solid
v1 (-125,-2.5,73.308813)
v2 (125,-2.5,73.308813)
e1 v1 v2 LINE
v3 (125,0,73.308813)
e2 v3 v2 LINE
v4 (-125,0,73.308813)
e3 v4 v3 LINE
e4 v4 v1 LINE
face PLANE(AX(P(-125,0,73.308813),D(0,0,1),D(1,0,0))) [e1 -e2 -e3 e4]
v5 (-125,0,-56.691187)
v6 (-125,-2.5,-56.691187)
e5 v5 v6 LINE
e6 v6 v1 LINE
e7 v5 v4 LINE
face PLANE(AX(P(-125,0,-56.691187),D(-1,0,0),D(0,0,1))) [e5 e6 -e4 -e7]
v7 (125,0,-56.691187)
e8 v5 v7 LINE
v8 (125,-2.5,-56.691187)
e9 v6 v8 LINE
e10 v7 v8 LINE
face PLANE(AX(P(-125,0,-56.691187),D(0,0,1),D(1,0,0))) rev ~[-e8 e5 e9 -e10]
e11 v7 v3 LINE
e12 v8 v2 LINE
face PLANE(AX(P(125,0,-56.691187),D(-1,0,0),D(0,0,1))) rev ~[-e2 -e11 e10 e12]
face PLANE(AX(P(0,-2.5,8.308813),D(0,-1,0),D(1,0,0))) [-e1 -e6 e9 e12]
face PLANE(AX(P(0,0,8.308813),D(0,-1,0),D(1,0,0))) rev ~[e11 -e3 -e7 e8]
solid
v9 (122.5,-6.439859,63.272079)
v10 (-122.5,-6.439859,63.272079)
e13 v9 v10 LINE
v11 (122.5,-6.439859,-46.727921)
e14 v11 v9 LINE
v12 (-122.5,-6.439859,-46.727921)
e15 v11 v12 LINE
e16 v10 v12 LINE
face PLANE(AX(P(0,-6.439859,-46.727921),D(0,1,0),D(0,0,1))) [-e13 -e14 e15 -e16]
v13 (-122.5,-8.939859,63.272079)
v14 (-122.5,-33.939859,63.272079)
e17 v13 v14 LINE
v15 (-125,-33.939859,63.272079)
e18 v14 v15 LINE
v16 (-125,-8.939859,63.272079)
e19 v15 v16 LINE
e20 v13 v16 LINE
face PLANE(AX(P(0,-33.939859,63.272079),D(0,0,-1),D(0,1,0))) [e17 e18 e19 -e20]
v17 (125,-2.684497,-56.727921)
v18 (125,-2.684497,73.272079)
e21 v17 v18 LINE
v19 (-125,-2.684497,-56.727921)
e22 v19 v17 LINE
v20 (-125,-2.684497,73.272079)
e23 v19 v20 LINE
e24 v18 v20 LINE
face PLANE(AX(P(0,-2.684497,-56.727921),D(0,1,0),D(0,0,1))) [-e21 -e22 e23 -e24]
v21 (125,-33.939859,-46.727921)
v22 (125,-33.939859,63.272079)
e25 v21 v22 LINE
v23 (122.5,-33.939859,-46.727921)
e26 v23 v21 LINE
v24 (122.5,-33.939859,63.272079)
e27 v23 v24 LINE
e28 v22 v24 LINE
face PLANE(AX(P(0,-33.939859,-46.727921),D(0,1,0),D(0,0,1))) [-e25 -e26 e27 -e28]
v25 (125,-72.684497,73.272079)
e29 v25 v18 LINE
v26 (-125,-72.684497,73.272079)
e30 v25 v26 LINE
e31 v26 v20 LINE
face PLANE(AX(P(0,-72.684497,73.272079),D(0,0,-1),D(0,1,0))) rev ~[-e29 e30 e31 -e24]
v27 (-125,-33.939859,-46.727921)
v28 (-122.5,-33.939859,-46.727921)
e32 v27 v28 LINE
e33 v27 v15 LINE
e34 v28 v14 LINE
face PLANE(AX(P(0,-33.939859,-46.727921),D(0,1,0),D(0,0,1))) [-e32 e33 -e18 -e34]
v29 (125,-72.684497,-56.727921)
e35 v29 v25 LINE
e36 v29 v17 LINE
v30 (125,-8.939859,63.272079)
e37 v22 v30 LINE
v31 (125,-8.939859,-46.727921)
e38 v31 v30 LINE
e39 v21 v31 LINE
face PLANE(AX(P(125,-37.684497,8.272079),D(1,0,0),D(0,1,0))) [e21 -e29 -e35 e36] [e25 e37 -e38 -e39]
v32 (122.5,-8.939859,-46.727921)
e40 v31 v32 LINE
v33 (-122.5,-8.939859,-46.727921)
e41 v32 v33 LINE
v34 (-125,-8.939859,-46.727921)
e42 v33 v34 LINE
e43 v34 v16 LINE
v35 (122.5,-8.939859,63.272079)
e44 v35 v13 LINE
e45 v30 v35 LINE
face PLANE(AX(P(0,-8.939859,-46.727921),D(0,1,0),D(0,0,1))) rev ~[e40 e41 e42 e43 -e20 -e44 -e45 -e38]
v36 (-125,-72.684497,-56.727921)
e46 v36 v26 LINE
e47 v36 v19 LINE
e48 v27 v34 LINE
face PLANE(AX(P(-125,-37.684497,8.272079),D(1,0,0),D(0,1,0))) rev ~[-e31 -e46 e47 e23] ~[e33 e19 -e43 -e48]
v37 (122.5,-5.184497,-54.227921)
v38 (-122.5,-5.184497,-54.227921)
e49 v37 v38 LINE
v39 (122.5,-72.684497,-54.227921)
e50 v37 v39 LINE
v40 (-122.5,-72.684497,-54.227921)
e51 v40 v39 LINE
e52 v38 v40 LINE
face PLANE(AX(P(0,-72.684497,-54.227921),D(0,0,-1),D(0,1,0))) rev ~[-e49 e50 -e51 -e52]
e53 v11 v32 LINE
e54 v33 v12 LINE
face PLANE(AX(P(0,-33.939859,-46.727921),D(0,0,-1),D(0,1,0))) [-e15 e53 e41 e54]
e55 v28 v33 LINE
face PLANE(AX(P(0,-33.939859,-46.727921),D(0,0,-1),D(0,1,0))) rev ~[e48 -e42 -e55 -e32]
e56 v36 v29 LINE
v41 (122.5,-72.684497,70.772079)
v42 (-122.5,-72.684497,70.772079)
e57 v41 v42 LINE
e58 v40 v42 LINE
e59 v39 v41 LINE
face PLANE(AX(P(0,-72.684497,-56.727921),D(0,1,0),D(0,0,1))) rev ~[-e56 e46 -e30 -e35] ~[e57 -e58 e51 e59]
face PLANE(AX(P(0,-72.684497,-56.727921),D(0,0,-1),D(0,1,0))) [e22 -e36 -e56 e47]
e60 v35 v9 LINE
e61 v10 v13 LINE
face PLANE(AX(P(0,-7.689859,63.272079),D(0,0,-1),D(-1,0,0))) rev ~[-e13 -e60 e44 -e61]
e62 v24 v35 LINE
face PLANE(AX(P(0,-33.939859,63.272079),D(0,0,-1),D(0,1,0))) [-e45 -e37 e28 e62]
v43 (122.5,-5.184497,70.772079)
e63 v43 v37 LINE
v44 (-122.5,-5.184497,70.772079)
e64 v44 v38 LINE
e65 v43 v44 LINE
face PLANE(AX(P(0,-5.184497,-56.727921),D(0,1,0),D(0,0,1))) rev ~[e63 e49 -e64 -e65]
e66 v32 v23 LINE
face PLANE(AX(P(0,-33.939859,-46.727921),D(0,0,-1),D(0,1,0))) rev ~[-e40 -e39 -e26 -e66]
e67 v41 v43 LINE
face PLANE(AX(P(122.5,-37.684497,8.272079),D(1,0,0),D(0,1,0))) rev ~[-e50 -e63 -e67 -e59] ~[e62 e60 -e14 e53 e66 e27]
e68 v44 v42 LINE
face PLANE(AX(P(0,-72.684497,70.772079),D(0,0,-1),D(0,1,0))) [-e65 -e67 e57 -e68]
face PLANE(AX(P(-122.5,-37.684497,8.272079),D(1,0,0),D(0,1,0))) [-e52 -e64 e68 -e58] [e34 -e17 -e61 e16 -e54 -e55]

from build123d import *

# Parameters (mm, degrees)
F0_W     = 250
F0_H     = 130
F1_DEPTH = 2.5
F2_W     = 70
F2_H     = 130
F2_W_2   = 25
F2_H_2   = 110
F3_DEPTH = 125
F4_T     = 2.5


# Not quite as in the source:
# - a shell that OpenCascade refuses in one call is made with other operations: the cavity is built on its own and cut out


with BuildPart() as f1:
    # F0 (on Front) → F1 (new body)
    with BuildSketch(Plane.XZ):
        with Locations((0, 8.3088127774)):
            Rectangle(F0_W, F0_H)
    extrude(amount=F1_DEPTH)


with BuildPart() as f3:
    # F2 (on Right) → F3 (new body, symmetric)
    with BuildSketch(Plane.YZ):
        with Locations((-37.6844966412, 8.2720792294)):
            Rectangle(F2_W, F2_H)
        with Locations((-21.439858526, 8.2720792294)):
            Rectangle(F2_W_2, F2_H_2, mode=Mode.SUBTRACT)
    extrude(amount=F3_DEPTH, both=True)

    # F4: shell of thickness 2.5, made by hand


with BuildPart() as f4_core1:
    # F4_t2: copy of F3
    add(f3.part)

    # the walls: a layer under each face that stays
    f4_faces = [f4_core1.faces().sort_by_distance(p)[0] for p in [
        (0, -2.6844966412, 8.2720792294),
        (0, -37.6844966412, -56.7279207706),
        (125, -37.6844966412, 8.2720792294),
        (0, -8.939858526, 8.2720792294),
        (0, -37.6844966412, 73.2720792294),
        (-125, -37.6844966412, 8.2720792294),
    ]]
    thicken(f4_faces, amount=-F4_T, mode=Mode.SUBTRACT)


with BuildPart() as f3_1:
    add(f3.part)

    # what is left inside the walls is the cavity
    f4_cavity = [f4_core1.part.solids().sort_by_distance(p)[0] for p in [
        (-40.833333, -5.209497, 8.272079),
    ]]
    add(f4_cavity, mode=Mode.SUBTRACT)


solid = Compound([f1.part, f3_1.part])
